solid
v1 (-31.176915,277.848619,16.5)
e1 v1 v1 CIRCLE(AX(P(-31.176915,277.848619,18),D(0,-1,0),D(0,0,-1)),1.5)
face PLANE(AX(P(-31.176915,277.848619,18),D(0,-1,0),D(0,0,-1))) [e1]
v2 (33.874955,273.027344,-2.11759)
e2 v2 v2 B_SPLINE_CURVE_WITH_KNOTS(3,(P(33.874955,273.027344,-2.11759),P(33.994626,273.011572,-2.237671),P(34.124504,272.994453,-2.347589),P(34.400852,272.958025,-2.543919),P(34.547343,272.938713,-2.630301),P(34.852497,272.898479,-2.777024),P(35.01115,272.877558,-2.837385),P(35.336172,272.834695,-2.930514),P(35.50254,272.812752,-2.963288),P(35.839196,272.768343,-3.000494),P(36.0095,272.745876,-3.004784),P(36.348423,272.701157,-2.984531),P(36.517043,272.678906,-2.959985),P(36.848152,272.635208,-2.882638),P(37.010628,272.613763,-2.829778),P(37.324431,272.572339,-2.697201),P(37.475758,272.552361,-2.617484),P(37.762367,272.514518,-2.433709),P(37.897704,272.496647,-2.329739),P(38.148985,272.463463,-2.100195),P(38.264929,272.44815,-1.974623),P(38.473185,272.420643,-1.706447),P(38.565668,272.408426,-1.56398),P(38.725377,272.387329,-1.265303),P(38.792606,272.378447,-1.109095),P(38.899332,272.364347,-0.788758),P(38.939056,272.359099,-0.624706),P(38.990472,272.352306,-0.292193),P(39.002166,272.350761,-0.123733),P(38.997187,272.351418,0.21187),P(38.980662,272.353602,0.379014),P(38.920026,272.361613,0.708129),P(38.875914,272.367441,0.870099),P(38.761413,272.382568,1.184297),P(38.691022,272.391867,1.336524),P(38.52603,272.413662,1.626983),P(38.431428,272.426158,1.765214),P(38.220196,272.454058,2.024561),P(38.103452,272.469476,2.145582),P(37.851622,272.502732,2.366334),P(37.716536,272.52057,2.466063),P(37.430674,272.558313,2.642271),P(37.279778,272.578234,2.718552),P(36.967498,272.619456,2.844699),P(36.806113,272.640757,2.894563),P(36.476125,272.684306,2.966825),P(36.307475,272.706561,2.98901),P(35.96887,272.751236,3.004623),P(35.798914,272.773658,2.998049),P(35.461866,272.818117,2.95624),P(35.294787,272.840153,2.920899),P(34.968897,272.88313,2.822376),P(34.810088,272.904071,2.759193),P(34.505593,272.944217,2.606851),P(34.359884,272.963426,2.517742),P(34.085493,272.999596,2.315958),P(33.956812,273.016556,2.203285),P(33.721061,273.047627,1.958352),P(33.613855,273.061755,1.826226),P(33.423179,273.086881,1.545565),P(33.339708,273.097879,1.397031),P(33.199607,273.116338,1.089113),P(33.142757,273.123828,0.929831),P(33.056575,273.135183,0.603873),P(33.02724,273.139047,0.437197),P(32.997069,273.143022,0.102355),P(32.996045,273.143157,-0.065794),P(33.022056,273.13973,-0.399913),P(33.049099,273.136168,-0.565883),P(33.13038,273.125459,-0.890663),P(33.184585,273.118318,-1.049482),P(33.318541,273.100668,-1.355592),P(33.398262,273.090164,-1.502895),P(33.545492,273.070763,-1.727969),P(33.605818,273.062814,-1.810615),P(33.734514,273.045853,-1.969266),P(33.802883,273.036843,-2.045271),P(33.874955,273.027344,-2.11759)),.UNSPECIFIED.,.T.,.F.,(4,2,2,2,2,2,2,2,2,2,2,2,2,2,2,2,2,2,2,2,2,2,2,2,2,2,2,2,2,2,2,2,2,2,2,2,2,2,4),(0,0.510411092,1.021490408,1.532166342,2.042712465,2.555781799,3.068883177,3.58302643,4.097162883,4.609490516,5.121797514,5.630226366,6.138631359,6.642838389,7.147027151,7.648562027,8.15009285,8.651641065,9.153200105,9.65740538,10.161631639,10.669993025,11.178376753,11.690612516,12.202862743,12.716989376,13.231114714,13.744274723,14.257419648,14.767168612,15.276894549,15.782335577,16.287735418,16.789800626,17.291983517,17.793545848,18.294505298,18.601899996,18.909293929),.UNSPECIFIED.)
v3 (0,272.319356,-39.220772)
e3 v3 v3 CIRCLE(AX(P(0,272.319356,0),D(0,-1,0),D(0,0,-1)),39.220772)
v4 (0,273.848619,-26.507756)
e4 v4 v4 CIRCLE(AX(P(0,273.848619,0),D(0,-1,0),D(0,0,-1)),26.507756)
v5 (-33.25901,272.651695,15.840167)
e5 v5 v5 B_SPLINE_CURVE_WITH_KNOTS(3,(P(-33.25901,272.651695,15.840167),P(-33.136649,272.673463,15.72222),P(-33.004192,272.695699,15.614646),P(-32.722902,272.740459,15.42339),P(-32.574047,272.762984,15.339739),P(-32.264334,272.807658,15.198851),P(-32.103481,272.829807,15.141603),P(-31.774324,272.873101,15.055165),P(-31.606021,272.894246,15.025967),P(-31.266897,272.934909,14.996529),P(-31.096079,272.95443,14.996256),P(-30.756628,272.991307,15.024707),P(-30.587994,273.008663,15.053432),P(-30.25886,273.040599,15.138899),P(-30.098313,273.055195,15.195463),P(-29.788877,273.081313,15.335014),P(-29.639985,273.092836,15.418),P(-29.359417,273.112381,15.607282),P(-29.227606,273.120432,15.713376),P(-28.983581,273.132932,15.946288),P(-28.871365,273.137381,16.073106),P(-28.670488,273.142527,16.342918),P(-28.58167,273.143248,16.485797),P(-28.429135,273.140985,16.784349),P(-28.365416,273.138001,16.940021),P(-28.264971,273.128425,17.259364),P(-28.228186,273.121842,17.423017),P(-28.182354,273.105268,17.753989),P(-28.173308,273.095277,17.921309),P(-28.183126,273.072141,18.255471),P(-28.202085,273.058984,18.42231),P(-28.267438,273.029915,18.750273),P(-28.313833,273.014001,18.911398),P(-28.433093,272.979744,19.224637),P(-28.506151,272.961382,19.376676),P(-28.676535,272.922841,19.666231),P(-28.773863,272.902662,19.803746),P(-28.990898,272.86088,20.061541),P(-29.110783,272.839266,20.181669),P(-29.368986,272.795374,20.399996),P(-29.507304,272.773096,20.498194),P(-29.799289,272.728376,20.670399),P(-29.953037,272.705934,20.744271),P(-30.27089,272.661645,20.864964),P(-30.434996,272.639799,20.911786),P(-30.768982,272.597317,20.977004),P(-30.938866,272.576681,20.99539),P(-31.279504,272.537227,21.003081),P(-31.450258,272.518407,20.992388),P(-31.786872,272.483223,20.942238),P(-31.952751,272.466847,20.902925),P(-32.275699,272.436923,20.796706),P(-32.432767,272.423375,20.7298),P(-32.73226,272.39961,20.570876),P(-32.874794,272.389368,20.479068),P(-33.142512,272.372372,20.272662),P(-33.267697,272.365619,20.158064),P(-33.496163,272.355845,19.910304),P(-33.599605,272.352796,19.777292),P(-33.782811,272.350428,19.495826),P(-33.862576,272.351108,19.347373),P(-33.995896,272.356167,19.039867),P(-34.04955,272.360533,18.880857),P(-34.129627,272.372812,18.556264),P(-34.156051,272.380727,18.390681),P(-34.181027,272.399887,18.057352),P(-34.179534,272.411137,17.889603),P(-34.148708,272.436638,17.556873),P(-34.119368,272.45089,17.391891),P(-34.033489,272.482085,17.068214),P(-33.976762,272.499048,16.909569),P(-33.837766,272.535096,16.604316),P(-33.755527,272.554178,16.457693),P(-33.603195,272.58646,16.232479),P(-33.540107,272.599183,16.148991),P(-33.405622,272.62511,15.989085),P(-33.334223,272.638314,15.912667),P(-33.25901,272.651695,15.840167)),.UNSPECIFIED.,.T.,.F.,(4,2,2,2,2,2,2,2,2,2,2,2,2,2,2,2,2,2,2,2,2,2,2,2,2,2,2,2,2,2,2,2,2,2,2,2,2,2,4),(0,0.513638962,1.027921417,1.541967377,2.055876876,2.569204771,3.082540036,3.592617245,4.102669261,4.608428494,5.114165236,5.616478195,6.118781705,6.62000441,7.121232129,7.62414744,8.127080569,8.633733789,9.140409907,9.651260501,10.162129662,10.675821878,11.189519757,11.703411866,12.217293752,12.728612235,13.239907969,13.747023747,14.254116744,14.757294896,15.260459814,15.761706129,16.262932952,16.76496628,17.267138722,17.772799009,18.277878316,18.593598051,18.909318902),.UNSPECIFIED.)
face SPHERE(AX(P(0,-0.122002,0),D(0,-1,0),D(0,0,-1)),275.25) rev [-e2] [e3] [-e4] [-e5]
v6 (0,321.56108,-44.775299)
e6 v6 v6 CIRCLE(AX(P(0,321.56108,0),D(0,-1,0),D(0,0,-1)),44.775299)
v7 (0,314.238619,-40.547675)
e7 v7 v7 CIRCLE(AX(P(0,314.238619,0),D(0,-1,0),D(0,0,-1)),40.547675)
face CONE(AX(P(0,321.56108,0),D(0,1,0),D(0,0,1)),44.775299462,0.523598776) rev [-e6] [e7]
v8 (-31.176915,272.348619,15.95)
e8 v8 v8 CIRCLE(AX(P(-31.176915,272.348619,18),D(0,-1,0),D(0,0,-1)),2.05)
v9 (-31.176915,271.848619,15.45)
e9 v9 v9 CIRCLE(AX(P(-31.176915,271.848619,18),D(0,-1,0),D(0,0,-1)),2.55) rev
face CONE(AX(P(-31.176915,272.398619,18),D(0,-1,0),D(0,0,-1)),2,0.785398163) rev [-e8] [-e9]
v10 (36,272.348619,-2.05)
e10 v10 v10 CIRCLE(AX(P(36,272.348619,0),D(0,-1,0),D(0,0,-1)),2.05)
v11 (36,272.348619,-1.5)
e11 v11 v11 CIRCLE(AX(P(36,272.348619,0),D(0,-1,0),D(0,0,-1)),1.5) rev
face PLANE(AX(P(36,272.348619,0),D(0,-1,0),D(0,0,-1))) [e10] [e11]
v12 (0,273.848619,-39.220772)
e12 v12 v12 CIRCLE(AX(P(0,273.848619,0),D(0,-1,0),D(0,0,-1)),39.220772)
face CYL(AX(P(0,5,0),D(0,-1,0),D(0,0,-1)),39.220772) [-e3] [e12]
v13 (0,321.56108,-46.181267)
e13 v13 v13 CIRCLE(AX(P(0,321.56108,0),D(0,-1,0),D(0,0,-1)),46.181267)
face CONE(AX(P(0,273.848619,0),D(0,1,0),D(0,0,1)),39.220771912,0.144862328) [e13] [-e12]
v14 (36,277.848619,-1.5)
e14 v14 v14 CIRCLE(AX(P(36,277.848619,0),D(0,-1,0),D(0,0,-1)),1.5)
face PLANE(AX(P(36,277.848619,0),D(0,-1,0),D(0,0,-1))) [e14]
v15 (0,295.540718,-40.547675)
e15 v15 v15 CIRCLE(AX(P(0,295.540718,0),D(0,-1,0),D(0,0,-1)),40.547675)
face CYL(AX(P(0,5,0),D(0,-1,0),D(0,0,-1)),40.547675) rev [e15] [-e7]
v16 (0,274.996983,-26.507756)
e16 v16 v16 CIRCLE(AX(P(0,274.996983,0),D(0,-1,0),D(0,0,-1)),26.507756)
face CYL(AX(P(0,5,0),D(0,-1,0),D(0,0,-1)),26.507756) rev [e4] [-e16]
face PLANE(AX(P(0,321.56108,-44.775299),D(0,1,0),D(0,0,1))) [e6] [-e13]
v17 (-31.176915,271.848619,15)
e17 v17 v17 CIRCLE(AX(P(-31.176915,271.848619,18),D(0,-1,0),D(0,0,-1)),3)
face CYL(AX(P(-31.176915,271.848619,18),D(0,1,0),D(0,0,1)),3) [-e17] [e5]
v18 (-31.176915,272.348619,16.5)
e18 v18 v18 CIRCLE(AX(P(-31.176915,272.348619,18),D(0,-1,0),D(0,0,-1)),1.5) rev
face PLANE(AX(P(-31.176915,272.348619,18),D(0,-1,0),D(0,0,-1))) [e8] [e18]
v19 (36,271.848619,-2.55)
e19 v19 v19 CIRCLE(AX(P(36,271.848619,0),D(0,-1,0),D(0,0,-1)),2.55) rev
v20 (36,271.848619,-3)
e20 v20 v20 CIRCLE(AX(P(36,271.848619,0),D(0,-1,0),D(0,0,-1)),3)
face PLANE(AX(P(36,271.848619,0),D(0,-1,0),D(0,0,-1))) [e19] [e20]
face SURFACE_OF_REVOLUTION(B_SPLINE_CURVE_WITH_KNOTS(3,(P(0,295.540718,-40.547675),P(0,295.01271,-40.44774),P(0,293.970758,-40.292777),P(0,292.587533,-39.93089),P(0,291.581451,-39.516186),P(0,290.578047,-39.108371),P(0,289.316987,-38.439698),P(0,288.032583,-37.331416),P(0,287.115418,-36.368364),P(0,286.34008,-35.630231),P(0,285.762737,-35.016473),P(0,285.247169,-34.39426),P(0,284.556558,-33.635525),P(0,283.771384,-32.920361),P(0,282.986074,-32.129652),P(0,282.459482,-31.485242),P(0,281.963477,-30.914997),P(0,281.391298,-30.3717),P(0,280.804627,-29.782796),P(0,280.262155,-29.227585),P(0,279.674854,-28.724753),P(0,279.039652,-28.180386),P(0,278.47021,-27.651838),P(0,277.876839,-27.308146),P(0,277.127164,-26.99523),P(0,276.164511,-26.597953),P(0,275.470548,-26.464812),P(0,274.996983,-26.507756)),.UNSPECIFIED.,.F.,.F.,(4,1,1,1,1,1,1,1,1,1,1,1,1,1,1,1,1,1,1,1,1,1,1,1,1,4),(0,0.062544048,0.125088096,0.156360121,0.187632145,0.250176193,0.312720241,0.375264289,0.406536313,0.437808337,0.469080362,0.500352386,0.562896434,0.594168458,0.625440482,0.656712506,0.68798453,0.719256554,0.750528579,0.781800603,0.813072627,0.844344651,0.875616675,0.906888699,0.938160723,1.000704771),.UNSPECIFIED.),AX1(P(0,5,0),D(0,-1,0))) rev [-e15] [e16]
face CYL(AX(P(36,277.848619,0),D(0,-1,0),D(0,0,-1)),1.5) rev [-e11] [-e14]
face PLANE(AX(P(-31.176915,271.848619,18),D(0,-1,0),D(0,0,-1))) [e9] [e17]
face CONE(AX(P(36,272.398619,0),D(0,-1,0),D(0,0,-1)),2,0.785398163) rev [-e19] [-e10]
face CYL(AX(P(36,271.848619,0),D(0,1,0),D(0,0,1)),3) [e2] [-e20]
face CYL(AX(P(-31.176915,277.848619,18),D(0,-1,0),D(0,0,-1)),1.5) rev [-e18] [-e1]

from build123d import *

# Parameters (mm, degrees)
SKETCH4_R           = 3
BOSS_EXTRUDE1_DEPTH = 2
SKETCH9_R           = 1.5
CUT_EXTRUDE1_DEPTH  = 6
SKETCH10_R          = 2
CUT_EXTRUDE2_DEPTH  = 0.5
CHAMFER3_SIZE       = 0.55


with BuildPart() as part:
    # Sketch2 → Revolve6 (revolve)
    with BuildSketch(Plane(origin=(0, 0, 0), x_dir=(0, 0, -1), z_dir=(1, 0, 0))):
        with BuildLine():
            Line((26.5077562, 274.996982717), (26.5077562, 273.848618937))
            Line((26.5077562, 273.848618937), (39.220771912, 273.848618937))
            Line((39.220771912, 273.848618937), (46.181267187, 321.561079724))
            Line((46.181267187, 321.561079724), (44.775299462, 321.561079724))
            Line((44.775299462, 321.561079724), (40.547674755, 314.238618937))
            Line((40.547674755, 314.238618937), (40.547674755, 295.540718438))
            add(Edge.make_bspline(
                [(40.547674755, 295.540718438), (40.447740466, 295.012709616), (40.292777353, 293.970757619), (39.930889755, 292.587532753), (39.516186416, 291.581451359), (39.108370782, 290.57804728), (38.439698054, 289.316986818), (37.331416086, 288.032583079), (36.368363881, 287.115418474), (35.630231264, 286.340079673), (35.016472726, 285.762737126), (34.394259795, 285.247169223), (33.635524662, 284.556557999), (32.920361334, 283.771384038), (32.129651901, 282.986073936), (31.485241784, 282.459482323), (30.914997208, 281.963476573), (30.371700346, 281.391298159), (29.782796159, 280.80462685), (29.227584581, 280.262154528), (28.724752618, 279.674853681), (28.180386253, 279.039651715), (27.651838315, 278.470209992), (27.308145935, 277.876839187), (26.995230081, 277.127164256), (26.597952618, 276.164510632), (26.464811583, 275.470548141), (26.5077562, 274.996982717)],
                knots=[0, 0, 0, 0, 0.062544048, 0.125088096, 0.156360121, 0.187632145, 0.250176193, 0.312720241, 0.375264289, 0.406536313, 0.437808337, 0.469080362, 0.500352386, 0.562896434, 0.594168458, 0.625440482, 0.656712506, 0.68798453, 0.719256554, 0.750528579, 0.781800603, 0.813072627, 0.844344651, 0.875616675, 0.906888699, 0.938160723, 1.000704771, 1.000704771, 1.000704771, 1.000704771], degree=3))
        make_face()
    revolve(axis=Axis((0, 5, 0), (0, 1, 0)))

    # Sketch4 → Boss-Extrude1 (add)
    with BuildSketch(Plane.XZ.offset(-273.848618937)):
        with Locations(Location((-31.176914536, 18, 0), (0, 0, 270))):
            Circle(SKETCH4_R)
        with Locations(Location((36, 0, 0), (0, 0, 270))):
            Circle(SKETCH4_R)
    extrude(amount=BOSS_EXTRUDE1_DEPTH)

    # Sketch7 → Revolve7 (revolve)
    with BuildSketch(Plane(origin=(0, 0, 0), x_dir=(0, 0, -1), z_dir=(1, 0, 0))):
        with BuildLine():
            Line((39.220771912, 273.848618937), (39.220771912, 272.319355593))
            ThreePointArc((39.220771912, 272.319355593), (32.873157949, 273.157923648), (26.5077562, 273.848618937))
            Line((26.5077562, 273.848618937), (26.5077562, 274.348618937))
            Line((26.5077562, 274.348618937), (39.220771912, 274.348618937))
            Line((39.220771912, 274.348618937), (39.220771912, 273.848618937))
        make_face()
    revolve(axis=Axis((0, 5, 0), (0, 1, 0)))

    # Sketch9 → Cut-Extrude1 (cut)
    with BuildSketch(Plane.XZ.offset(-271.848618937)):
        with Locations(Location((36, 0, 0), (0, 0, 270))):
            Circle(SKETCH9_R)
        with Locations(Location((-31.176914536, 18, 0), (0, 0, 270))):
            Circle(SKETCH9_R)
    extrude(amount=-CUT_EXTRUDE1_DEPTH, mode=Mode.SUBTRACT)

    # Sketch10 → Cut-Extrude2 (cut)
    with BuildSketch(Plane.XZ.offset(-271.848618937)):
        with Locations(Location((36, 0, 0), (0, 0, 270))):
            Circle(SKETCH10_R)
        with Locations(Location((-31.176914536, 18, 0), (0, 0, 270))):
            Circle(SKETCH10_R)
    extrude(amount=-CUT_EXTRUDE2_DEPTH, mode=Mode.SUBTRACT)

    # Chamfer3
    # the kernel refuses this chamfer: 0.55 mm, written as the material it takes off along each edge
    with BuildSketch(Plane(origin=(36, 271.848618937, 0), x_dir=(0, 0, -1), z_dir=(-1, 0, 0))) as chamfer3_piece_1_section:
        Polygon((2 + CHAMFER3_SIZE, 0), (2, -CHAMFER3_SIZE), (2, 0), align=None)
    chamfer3_piece_1 = revolve(axis=Axis((36, 271.848618937, 0), (0, -1, 0)), mode=Mode.PRIVATE)
    chamfer3_piece_1 = split(chamfer3_piece_1, bisect_by=Plane(origin=(36, 272.348618937, 2.298516155), z_dir=(0, -1, 0)), keep=Keep.TOP, mode=Mode.PRIVATE)
    add(chamfer3_piece_1, mode=Mode.SUBTRACT)
    with BuildSketch(Plane(origin=(-31.176914536, 271.848618937, 18), x_dir=(0, 0, -1), z_dir=(-1, 0, 0))) as chamfer3_piece_2_section:
        Polygon((2 + CHAMFER3_SIZE, 0), (2, -CHAMFER3_SIZE), (2, 0), align=None)
    chamfer3_piece_2 = revolve(axis=Axis((-31.176914536, 271.848618937, 18), (0, -1, 0)), mode=Mode.PRIVATE)
    chamfer3_piece_2 = split(chamfer3_piece_2, bisect_by=Plane(origin=(-31.176914536, 272.348618937, 20.298516155), z_dir=(0, -1, 0)), keep=Keep.TOP, mode=Mode.PRIVATE)
    add(chamfer3_piece_2, mode=Mode.SUBTRACT)


solid = part.part
